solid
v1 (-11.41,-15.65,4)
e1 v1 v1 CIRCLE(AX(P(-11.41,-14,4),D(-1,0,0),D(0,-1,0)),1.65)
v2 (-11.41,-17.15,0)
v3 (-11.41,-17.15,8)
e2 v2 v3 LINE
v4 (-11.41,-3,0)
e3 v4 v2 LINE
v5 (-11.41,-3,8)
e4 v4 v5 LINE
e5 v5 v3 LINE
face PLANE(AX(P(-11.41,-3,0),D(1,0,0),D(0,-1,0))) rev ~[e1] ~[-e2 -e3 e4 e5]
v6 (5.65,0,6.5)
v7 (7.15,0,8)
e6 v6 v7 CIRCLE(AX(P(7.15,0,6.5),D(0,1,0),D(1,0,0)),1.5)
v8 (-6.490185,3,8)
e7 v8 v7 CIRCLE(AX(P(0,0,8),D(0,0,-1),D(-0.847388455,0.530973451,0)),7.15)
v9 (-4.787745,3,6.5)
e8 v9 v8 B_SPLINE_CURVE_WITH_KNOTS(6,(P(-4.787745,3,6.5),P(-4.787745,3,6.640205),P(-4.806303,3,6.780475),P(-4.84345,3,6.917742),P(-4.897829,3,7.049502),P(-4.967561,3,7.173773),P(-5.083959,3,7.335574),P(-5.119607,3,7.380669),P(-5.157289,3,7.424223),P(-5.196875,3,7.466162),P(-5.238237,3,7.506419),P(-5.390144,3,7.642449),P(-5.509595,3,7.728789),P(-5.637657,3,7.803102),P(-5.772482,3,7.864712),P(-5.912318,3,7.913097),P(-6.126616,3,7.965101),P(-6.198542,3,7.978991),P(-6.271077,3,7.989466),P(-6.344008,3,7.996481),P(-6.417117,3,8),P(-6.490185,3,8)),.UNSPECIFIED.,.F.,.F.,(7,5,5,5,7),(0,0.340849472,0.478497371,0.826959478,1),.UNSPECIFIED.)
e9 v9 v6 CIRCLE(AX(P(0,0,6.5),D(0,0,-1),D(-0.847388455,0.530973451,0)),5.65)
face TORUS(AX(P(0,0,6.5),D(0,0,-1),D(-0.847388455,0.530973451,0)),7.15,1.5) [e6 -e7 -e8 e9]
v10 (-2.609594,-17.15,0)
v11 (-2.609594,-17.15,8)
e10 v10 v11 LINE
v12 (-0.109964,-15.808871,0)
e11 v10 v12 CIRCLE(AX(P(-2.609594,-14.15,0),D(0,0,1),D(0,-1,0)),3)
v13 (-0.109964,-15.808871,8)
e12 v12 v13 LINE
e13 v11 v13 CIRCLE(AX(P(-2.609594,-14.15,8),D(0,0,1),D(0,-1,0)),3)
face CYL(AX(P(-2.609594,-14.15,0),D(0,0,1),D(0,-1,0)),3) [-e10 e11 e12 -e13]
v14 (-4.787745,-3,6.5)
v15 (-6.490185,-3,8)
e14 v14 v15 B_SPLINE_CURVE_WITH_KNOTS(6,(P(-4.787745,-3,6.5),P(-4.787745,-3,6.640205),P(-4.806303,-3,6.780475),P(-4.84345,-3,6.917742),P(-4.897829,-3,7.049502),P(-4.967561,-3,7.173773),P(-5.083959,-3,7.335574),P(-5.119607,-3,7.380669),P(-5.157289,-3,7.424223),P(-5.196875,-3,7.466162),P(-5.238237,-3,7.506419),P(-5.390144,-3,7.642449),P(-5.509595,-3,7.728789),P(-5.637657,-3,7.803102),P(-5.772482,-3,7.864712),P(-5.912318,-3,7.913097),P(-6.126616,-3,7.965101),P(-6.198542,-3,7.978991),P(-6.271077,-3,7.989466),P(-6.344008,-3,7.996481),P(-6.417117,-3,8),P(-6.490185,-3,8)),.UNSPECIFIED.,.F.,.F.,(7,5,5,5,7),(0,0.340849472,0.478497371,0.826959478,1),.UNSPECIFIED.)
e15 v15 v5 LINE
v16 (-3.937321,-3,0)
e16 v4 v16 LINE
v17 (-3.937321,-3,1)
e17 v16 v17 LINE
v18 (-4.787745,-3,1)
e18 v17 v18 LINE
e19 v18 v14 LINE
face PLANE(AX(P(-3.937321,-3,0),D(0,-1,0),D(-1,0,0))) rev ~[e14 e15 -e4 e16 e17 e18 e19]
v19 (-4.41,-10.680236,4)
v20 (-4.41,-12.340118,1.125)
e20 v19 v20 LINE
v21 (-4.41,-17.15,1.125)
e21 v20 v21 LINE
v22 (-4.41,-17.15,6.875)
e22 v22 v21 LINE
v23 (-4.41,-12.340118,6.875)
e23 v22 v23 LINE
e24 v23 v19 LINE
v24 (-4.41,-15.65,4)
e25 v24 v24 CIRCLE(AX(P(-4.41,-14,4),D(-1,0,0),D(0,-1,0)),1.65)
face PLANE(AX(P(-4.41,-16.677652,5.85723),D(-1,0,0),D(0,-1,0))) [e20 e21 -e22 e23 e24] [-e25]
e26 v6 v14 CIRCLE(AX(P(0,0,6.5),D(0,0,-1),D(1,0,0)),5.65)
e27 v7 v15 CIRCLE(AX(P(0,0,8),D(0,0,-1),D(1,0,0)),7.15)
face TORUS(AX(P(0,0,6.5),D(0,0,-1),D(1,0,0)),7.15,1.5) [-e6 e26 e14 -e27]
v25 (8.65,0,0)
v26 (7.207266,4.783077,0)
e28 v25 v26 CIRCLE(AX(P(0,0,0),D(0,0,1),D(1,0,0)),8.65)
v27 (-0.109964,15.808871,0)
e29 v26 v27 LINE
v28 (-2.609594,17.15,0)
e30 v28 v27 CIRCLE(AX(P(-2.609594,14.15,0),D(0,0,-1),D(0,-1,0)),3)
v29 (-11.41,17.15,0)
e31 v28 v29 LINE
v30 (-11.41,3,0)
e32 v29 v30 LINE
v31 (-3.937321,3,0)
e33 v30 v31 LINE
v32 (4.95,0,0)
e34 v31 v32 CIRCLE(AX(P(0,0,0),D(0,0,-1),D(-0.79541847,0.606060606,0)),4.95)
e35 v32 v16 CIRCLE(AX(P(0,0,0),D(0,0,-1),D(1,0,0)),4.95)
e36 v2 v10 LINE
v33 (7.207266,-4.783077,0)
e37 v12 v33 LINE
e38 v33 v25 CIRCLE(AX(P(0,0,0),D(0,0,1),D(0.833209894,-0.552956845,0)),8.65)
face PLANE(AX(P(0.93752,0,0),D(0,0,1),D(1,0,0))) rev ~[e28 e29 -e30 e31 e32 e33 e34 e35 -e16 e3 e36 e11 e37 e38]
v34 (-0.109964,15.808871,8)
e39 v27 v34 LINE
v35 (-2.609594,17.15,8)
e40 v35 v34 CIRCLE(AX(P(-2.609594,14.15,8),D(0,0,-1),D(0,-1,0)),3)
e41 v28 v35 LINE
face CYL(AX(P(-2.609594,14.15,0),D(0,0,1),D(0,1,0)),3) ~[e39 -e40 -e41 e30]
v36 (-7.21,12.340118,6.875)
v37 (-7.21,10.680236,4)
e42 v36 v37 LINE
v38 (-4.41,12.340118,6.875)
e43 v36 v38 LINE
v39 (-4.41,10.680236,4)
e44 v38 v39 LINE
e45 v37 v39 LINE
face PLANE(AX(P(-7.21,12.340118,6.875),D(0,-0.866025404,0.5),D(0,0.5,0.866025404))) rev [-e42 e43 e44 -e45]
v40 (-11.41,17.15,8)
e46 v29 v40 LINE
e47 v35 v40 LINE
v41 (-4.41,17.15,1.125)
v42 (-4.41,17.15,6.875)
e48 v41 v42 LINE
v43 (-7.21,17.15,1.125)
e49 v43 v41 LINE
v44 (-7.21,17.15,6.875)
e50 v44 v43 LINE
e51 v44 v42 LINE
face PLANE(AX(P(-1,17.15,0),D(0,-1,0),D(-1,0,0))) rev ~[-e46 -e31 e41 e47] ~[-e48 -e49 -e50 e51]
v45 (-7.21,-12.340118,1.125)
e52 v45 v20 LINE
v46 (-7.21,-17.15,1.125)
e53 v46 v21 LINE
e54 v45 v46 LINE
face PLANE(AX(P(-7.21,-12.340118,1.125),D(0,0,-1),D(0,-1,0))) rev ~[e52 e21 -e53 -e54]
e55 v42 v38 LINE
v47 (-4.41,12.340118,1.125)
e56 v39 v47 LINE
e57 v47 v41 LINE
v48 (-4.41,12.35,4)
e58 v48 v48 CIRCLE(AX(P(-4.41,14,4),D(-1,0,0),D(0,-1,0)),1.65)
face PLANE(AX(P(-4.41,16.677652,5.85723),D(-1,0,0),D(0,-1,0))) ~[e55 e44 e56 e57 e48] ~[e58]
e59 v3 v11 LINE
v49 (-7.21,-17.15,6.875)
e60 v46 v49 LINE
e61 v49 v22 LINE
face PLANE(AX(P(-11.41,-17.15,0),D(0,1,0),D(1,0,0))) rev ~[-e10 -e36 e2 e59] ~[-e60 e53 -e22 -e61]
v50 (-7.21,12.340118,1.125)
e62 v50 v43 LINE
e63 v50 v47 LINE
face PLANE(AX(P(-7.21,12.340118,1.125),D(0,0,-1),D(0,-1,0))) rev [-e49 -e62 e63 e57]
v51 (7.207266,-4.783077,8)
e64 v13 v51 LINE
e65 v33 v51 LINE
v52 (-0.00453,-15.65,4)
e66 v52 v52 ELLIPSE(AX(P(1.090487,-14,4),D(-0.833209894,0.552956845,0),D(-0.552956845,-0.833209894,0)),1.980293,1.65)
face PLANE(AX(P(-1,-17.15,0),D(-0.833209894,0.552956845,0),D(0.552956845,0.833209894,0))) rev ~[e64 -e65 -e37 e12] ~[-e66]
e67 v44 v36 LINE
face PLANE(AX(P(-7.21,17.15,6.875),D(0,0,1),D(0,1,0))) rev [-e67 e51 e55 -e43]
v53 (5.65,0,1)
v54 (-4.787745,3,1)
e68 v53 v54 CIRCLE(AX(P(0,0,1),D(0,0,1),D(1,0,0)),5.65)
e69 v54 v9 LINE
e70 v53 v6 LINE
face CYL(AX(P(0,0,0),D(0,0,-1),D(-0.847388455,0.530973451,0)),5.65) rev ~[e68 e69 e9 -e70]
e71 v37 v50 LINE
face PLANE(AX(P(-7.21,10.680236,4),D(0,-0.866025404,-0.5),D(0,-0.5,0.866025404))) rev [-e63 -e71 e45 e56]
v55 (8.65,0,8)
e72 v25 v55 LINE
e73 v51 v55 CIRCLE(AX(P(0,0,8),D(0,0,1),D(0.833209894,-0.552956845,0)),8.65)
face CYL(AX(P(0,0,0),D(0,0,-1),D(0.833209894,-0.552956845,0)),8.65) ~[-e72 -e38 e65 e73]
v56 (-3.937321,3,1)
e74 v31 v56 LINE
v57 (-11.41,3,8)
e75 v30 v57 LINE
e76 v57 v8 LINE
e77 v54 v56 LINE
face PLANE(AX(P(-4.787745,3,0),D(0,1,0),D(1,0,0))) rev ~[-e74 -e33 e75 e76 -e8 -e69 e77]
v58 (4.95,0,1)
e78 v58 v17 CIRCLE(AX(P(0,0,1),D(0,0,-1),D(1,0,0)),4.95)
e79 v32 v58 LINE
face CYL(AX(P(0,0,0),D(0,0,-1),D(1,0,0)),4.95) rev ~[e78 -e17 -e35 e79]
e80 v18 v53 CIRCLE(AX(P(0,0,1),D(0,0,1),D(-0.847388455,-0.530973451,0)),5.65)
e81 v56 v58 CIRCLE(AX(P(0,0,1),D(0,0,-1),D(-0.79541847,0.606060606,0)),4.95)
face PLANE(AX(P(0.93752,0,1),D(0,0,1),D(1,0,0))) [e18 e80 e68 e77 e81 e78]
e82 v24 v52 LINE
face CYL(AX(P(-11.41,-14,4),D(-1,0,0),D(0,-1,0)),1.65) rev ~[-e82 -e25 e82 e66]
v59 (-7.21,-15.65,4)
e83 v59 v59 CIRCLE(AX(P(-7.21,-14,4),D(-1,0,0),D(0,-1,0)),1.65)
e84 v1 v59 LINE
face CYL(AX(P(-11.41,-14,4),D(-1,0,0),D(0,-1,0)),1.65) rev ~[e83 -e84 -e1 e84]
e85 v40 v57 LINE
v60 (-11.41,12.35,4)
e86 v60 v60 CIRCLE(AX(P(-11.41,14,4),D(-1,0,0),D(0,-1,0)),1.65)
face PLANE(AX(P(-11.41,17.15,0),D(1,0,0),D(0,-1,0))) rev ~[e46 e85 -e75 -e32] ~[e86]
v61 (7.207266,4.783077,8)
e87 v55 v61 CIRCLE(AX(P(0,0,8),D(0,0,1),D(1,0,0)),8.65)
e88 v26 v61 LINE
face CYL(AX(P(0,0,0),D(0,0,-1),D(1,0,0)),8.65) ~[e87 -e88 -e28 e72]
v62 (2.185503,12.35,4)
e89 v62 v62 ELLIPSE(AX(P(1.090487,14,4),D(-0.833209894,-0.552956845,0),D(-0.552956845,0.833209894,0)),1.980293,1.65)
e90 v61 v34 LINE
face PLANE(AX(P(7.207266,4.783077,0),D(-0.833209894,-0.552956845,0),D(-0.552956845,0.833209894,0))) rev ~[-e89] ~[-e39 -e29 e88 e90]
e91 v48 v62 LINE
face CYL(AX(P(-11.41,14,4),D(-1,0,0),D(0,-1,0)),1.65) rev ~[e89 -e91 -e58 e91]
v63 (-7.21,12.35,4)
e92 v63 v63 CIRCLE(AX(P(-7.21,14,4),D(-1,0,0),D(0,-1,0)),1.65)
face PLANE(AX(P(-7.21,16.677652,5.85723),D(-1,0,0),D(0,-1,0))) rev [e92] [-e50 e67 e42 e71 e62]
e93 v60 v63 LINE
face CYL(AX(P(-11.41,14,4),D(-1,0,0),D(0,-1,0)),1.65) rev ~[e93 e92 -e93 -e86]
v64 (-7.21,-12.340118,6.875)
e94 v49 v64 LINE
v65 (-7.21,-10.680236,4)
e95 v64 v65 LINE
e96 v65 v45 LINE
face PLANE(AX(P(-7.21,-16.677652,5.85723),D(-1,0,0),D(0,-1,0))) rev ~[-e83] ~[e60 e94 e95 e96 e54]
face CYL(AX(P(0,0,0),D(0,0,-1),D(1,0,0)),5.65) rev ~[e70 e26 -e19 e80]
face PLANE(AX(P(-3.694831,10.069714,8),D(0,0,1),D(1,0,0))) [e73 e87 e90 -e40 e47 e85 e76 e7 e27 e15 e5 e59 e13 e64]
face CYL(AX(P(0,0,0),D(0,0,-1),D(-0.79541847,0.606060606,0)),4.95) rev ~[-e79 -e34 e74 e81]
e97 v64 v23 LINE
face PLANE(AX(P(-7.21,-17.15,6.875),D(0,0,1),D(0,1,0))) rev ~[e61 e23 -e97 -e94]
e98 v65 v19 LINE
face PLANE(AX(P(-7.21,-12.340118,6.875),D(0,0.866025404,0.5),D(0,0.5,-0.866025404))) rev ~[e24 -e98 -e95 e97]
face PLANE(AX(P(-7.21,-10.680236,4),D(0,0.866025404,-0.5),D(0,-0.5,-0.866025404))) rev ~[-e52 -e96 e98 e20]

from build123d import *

# Parameters (mm, degrees)
F3_DEPTH = 8
F4_DEPTH = 1
F5_R     = 1.65
F6_DEPTH = 13.5965032877
F9_DEPTH = 2.8
F10_R    = 1.5
F11_R    = 3


# Not quite as in the source:
# - a pattern or mirror of a feature is missing from the dataset's text; its kind, count and spacing are read off the source's solid
# - a feature names something its author has since deleted; it is built from what else it names


with BuildPart() as f3:
    # F2 (on Top) → F3 (new body)
    with BuildSketch(Plane.XY):
        with BuildLine():
            Line((-11.41, 3), (-8.1131066799, 3))
            ThreePointArc((-8.1131066799, 3), (-0.999988831, 8.5920033949), (7.2072655829, 4.7830767104))
            Line((7.2072655829, 4.7830767104), (-1, 17.15))
            Line((-1, 17.15), (-11.41, 17.15))
            Line((-11.41, 17.15), (-11.41, 3))
        make_face()
        with BuildLine():
            ThreePointArc((7.2072655829, -4.7830767104), (-0.999988831, -8.5920033949), (-8.1131066799, -3))
            Line((-8.1131066799, -3), (-11.41, -3))
            Line((-11.41, -3), (-11.41, -17.15))
            Line((-11.41, -17.15), (-1, -17.15))
            Line((-1, -17.15), (7.2072655829, -4.7830767104))
        make_face()
        with BuildLine():
            ThreePointArc((-4.7877447718, 3), (1.5607277212, 5.430159204), (5.65, 0))
            ThreePointArc((5.65, 0), (1.5607277212, -5.430159204), (-4.7877447718, -3))
            Line((-4.7877447718, -3), (-8.1131066799, -3))
            ThreePointArc((-8.1131066799, -3), (-0.999988831, -8.5920033949), (7.2072655829, -4.7830767104))
            ThreePointArc((7.2072655829, -4.7830767104), (8.2814656702, -2.4979644421), (8.65, 0))
            ThreePointArc((8.65, 0), (8.2814656702, 2.4979644421), (7.2072655829, 4.7830767104))
            ThreePointArc((7.2072655829, 4.7830767104), (-0.999988831, 8.5920033949), (-8.1131066799, 3))
            Line((-8.1131066799, 3), (-4.7877447718, 3))
        make_face()
    extrude(amount=F3_DEPTH)

    # F2 (on Top) → F4 (join)
    with BuildSketch(Plane.XY):
        with BuildLine():
            ThreePointArc((-4.7877447718, -3), (1.5607277212, -5.430159204), (5.65, 0))
            ThreePointArc((5.65, 0), (1.5607277212, 5.430159204), (-4.7877447718, 3))
            Line((-4.7877447718, 3), (-3.9373214245, 3))
            ThreePointArc((-3.9373214245, 3), (1.5831549117, 4.6900021882), (4.95, 0))
            ThreePointArc((4.95, 0), (1.5831549117, -4.6900021882), (-3.9373214245, -3))
            Line((-3.9373214245, -3), (-4.7877447718, -3))
        make_face()
    extrude(amount=F4_DEPTH)

    # F5 (on face) → F6 (cut, through all)
    with BuildSketch(Plane(origin=(-11.41, 0, 0), x_dir=(0, -1, 0), z_dir=(-1, 0, 0))):
        with Locations((14, 4)):
            Circle(F5_R)
        with Locations((-14, 4)):
            Circle(F5_R)
    extrude(amount=-F6_DEPTH, mode=Mode.SUBTRACT)

    # F8 (on offset) → F9 (cut)
    with BuildSketch(Plane(origin=(-7.21, 0, 0), x_dir=(0, -1, 0), z_dir=(-1, 0, 0))):
        Polygon((17.15, 6.875), (15.6598820239, 6.875), (17.15, 4.2940399562), align=None)
        Polygon((17.15, 4.2940399562), (15.6598820239, 6.875), (12.3401179761, 6.875), (10.6802359522, 4), (12.3401179761, 1.125), (15.6598820239, 1.125), (17.15, 3.7059600438), align=None)
        Polygon((17.3197640478, 4), (17.15, 4.2940399562), (17.15, 3.7059600438), align=None)
        Polygon((17.15, 1.125), (17.15, 3.7059600438), (15.6598820239, 1.125), align=None)
    f9 = extrude(amount=-F9_DEPTH, mode=Mode.SUBTRACT)

    # F9_copies: F9 across plane
    add(f9.mirror(Plane.ZX), mode=Mode.SUBTRACT)

    # F10
    f10_edges = [f3.edges().sort_by_distance(p)[0] for p in [
        (5.65, 0, 8),
    ]]
    fillet(f10_edges, radius=F10_R)

    # F11
    f11_edges = [f3.edges().sort_by_distance(p)[0] for p in [
        (-1, -17.15, 4),
        (-1, 17.15, 4),
    ]]
    fillet(f11_edges, radius=F11_R)


solid = f3.part
